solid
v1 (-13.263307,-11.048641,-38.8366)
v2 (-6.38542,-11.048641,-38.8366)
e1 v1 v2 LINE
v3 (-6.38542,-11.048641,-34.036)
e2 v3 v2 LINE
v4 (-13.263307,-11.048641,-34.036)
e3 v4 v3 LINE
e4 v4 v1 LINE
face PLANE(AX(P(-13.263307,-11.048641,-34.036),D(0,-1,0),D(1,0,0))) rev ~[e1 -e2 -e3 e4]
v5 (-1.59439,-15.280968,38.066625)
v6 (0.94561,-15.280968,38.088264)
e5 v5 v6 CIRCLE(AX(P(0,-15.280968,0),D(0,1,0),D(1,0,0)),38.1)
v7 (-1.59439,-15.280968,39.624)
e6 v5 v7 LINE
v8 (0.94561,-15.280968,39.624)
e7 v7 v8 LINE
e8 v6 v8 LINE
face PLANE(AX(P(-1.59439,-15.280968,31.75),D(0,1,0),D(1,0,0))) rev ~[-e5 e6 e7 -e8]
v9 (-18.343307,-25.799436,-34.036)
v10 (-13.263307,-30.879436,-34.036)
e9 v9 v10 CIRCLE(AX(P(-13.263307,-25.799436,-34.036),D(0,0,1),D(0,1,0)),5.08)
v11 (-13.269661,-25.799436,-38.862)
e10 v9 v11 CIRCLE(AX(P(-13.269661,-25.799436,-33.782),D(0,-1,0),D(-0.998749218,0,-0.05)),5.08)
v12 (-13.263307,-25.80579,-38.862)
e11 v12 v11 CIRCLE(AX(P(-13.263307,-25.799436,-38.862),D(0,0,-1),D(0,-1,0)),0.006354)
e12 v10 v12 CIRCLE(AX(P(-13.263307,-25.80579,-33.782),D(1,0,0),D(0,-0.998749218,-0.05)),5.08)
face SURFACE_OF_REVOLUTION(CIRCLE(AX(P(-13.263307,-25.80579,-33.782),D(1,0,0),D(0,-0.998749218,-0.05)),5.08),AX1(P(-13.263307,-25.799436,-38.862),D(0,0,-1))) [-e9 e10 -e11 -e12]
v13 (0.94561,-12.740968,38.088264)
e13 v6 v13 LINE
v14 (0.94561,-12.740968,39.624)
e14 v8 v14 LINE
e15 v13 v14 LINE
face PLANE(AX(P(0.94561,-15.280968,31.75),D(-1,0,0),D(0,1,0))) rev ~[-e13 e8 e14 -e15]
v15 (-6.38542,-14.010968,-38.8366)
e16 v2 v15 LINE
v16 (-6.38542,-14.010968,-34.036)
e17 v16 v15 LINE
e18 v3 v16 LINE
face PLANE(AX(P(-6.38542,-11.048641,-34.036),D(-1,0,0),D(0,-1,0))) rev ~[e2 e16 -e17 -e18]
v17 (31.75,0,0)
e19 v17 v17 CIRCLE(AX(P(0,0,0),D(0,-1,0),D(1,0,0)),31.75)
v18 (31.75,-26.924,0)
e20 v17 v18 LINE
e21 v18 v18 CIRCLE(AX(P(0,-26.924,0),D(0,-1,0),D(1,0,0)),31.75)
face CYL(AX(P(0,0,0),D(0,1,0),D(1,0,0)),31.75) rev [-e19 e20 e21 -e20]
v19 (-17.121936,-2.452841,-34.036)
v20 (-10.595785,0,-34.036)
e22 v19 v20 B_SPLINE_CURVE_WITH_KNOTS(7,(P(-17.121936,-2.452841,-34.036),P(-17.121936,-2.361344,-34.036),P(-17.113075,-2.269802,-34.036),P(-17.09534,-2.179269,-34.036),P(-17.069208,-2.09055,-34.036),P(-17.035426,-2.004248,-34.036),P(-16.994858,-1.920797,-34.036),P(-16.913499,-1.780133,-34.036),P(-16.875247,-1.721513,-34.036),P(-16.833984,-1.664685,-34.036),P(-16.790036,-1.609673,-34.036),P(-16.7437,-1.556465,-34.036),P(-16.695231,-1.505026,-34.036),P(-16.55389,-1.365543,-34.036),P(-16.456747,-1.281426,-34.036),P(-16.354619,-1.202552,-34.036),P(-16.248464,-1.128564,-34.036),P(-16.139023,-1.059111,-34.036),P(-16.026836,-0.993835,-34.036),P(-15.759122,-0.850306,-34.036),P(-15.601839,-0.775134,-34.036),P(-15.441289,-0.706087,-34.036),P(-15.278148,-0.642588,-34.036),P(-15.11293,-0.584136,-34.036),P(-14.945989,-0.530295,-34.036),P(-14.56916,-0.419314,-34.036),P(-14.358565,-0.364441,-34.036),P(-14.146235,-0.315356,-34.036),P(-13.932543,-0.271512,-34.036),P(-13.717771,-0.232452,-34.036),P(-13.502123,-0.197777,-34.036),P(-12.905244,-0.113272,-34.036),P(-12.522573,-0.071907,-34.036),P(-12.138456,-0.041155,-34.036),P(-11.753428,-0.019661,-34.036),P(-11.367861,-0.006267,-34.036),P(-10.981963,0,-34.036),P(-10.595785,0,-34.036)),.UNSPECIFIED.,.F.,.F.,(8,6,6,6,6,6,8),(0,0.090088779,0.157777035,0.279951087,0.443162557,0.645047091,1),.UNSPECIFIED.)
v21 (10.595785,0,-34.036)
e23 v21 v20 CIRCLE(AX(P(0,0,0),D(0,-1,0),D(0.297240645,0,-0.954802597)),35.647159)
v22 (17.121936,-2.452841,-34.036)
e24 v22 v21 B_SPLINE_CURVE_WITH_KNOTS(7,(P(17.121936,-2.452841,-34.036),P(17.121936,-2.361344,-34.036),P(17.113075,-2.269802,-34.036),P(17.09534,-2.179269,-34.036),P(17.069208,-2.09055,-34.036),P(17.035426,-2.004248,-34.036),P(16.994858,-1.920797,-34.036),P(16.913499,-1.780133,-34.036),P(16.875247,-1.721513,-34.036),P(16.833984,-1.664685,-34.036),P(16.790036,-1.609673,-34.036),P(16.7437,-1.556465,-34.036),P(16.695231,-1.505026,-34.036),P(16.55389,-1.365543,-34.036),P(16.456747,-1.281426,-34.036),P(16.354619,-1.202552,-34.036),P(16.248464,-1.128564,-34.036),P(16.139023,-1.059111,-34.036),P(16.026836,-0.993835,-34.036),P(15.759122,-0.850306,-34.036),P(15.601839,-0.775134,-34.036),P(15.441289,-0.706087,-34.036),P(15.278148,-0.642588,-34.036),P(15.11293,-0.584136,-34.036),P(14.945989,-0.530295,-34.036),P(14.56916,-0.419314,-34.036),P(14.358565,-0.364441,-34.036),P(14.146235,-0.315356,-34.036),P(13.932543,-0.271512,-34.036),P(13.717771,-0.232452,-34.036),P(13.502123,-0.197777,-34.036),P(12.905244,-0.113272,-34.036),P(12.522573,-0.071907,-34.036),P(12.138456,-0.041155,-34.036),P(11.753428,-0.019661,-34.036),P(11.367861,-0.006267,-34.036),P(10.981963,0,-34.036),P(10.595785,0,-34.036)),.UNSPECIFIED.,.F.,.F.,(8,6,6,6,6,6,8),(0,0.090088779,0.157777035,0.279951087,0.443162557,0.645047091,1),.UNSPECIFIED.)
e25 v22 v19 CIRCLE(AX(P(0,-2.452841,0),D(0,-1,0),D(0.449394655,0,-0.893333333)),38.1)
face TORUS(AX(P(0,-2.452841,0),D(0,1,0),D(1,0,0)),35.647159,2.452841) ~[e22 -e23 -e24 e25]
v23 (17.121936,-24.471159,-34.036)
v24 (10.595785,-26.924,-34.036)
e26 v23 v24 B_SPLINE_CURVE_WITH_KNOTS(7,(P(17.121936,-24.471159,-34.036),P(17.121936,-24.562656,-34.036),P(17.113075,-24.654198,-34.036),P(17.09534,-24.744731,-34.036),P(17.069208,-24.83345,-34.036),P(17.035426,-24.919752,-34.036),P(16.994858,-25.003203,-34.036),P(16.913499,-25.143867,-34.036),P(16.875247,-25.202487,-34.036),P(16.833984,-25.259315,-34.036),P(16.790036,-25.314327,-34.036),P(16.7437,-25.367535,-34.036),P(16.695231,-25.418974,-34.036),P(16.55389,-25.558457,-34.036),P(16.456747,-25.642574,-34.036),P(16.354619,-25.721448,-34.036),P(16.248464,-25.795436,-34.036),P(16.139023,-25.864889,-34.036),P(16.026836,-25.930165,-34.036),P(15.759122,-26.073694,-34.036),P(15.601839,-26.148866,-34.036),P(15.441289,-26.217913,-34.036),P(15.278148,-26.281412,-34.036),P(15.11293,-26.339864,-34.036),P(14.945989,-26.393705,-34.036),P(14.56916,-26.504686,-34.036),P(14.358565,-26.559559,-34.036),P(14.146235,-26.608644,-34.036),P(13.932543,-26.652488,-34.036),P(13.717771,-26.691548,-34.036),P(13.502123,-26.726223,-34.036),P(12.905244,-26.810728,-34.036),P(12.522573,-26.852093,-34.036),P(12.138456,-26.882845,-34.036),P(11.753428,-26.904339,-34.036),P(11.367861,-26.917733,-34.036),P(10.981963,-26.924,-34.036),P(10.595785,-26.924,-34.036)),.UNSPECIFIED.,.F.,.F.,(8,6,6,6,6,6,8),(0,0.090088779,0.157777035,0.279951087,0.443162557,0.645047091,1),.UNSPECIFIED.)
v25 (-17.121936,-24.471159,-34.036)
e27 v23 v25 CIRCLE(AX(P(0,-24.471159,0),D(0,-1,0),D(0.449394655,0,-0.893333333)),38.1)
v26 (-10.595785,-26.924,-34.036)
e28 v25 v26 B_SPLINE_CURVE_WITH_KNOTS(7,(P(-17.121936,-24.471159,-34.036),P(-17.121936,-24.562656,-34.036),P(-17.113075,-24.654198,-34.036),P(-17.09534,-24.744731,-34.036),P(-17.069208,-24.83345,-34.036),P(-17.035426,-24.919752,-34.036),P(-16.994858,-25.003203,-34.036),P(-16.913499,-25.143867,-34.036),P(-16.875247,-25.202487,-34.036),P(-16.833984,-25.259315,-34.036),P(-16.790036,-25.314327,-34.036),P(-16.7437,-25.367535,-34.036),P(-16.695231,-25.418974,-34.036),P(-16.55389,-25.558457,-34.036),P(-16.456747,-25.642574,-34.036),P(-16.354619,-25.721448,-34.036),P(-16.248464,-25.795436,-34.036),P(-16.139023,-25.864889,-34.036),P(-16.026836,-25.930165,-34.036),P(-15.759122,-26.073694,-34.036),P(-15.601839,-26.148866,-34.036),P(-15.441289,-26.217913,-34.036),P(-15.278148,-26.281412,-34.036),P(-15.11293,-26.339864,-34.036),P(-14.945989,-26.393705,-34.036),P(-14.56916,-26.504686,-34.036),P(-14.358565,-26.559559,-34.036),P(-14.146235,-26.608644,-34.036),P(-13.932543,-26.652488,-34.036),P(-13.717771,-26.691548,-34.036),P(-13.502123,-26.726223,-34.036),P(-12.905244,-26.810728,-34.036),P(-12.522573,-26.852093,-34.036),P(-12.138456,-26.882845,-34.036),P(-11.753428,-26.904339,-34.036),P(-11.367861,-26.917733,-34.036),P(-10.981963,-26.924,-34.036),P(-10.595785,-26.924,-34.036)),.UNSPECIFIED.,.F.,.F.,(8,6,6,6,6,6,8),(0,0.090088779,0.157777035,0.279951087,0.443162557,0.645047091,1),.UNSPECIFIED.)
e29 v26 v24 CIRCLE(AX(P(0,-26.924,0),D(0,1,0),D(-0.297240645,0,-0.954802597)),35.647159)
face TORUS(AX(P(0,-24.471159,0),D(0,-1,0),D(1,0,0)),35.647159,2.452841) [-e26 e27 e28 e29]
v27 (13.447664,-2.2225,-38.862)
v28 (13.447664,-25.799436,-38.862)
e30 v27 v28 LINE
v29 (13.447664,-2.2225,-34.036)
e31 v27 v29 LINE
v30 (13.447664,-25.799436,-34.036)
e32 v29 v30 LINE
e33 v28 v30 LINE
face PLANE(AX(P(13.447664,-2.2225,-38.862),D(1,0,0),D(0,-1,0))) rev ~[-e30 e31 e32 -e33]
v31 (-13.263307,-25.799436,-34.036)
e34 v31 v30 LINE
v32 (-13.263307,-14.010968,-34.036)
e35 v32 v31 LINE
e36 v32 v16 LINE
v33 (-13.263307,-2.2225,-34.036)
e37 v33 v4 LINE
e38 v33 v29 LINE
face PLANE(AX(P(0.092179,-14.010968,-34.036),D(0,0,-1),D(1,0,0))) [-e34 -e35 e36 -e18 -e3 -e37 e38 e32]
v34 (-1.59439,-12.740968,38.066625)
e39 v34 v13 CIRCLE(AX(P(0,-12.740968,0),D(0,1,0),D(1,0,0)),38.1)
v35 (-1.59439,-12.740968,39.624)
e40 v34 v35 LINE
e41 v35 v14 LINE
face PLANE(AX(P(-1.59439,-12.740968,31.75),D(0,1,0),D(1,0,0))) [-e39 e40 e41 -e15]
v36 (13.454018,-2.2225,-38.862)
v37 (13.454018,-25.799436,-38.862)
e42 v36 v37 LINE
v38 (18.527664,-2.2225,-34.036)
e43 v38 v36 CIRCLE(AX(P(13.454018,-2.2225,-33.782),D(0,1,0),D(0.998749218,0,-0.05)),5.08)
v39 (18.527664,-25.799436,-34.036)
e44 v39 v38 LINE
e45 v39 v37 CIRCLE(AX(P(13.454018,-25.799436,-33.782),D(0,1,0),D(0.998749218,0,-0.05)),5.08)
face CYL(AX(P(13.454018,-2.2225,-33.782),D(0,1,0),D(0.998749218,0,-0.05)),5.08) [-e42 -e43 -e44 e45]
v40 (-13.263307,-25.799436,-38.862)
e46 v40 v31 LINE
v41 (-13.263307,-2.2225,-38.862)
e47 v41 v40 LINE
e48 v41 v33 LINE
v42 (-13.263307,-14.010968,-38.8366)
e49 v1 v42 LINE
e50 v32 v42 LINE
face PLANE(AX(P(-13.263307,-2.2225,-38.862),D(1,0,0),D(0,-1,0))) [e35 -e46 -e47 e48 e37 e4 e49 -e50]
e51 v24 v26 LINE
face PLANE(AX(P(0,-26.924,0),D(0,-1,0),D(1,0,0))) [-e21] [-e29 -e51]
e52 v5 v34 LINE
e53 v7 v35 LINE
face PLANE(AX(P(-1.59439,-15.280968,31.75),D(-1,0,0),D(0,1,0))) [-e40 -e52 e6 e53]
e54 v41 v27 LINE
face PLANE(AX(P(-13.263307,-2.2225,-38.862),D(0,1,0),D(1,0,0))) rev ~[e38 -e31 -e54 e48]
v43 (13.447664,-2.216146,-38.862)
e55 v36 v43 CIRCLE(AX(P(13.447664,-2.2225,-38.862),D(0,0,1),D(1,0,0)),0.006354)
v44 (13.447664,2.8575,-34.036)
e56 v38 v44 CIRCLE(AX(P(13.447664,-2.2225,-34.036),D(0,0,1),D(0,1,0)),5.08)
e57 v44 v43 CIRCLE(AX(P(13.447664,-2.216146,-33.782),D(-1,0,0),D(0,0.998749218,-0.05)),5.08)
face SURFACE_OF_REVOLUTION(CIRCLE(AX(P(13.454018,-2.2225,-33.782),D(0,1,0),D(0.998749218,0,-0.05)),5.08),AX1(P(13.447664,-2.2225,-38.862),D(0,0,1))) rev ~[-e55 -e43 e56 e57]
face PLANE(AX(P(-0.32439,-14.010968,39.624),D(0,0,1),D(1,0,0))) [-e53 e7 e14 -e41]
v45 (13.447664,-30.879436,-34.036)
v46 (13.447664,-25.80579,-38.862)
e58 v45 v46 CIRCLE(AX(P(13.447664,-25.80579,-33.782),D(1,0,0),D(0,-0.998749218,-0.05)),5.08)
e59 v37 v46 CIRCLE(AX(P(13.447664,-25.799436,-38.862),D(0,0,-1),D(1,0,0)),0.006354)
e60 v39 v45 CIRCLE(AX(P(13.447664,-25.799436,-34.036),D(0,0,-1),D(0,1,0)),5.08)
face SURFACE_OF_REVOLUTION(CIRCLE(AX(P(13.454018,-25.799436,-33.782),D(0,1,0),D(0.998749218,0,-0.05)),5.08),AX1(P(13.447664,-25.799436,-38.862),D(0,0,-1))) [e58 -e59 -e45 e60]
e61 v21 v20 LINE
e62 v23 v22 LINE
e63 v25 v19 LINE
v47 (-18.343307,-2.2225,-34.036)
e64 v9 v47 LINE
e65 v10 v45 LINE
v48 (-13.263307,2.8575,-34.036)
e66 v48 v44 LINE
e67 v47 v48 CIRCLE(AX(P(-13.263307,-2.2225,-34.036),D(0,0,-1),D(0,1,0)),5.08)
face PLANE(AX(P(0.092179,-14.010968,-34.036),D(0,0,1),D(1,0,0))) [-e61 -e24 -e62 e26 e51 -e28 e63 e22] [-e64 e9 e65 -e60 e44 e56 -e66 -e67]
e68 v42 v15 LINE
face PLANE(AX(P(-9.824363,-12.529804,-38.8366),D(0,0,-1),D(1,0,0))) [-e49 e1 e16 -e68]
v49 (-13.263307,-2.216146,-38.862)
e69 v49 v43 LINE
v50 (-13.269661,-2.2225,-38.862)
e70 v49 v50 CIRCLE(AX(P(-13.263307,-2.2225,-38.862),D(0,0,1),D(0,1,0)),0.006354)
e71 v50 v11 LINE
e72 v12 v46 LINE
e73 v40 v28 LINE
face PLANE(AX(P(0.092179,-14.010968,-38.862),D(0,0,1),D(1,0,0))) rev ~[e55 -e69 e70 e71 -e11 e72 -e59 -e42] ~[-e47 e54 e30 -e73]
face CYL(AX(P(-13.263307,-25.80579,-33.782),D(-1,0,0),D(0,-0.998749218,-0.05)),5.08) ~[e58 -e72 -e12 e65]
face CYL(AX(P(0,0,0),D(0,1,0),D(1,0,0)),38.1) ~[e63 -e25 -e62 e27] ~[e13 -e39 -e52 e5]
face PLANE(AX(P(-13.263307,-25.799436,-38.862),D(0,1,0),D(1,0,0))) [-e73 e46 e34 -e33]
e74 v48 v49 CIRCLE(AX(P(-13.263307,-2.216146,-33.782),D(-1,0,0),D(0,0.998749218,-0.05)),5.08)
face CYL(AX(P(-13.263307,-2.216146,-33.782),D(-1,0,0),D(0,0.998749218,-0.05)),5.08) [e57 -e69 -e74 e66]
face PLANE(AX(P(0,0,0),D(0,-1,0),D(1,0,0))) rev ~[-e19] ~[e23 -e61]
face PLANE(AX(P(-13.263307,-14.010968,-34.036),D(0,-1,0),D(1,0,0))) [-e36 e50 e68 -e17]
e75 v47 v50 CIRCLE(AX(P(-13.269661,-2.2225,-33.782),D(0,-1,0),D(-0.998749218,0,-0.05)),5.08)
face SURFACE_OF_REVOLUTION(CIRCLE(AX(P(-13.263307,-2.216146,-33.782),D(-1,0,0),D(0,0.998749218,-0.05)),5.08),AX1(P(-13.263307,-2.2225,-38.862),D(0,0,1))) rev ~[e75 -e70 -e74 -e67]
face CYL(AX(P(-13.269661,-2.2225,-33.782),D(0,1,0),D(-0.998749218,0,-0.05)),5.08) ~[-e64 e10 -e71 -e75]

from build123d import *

# Parameters (mm, degrees)
F0_R         = 38.1
F0_R_2       = 31.75
F1_DEPTH     = 26.924
F2_R         = 2.4528409794
F4_START     = -34.036
F3_W         = 36.8709713221
F3_H         = 33.7369362824
F4_DEPTH     = 4.826
F5_R         = 5.08
F6_W         = 26.7109713221
F6_H         = 23.5769362824
F7_DEPTH     = 4.826
F8_T1_DEPTH  = 26.7109713221
F8_T3_DEPTH  = 23.5769362824
F8_T6_ANGLE  = 90
F8_T8_ANGLE  = 90
F8_T10_ANGLE = 90
F8_T12_ANGLE = 90
F9_W         = 6.8778875601
F9_H         = 2.9623268638
F10_DEPTH    = 4.8006
F12_START    = 31.75
F11_W        = 2.54
F11_H        = 2.54
F12_DEPTH    = 7.874


# Not quite as in the source:
# - a fillet or chamfer that OpenCascade refuses, or shapes differently, is made with other operations: its cross-section is extruded or revolved along the edge and cut away or added


with BuildPart() as f1:
    # F0 (on Front) → F1 (new body)
    with BuildSketch(Plane.XZ):
        Circle(F0_R)
        Circle(F0_R_2, mode=Mode.SUBTRACT)
    extrude(amount=F1_DEPTH)

    # F2
    f2_edges = [f1.edges().sort_by_distance(p)[0] for p in [
        (-38.1, -26.924, 0),
        (-38.1, 0, 0),
    ]]
    fillet(f2_edges, radius=F2_R)

    # F3 (on Top) → F4 (join)
    with BuildSketch(Plane.XY.offset(F4_START)):
        with Locations((0.0921785831, -14.0109679196)):
            Rectangle(F3_W, F3_H)
    extrude(amount=-F4_DEPTH)

    # F5
    f5_edges = [f1.edges().sort_by_distance(p)[0] for p in [
        (-18.343307, 2.8575, -36.449),
        (18.527664, 2.8575, -36.449),
        (18.527664, -30.879436, -36.449),
        (-18.343307, -30.879436, -36.449),
    ]]
    fillet(f5_edges, radius=F5_R)

    # F6 (on face) → F7 (cut)
    with BuildSketch(Plane(origin=(0, 0, -38.862), x_dir=(1, 0, 0), z_dir=(0, 0, -1))):
        with Locations((0.0921785831, 14.0109679196)):
            Rectangle(F6_W, F6_H)
    extrude(amount=-F7_DEPTH, mode=Mode.SUBTRACT)

    # F8: fillet of radius 5.08 on 1 edges, made by hand

    # F8_s2 → F8_t1 (cut)
    with BuildSketch(Plane.YZ.offset(-13.2633070779)):
        with BuildLine():
            ThreePointArc((-30.8794360608, -34.036), (-29.3069384175, -37.4628096935), (-25.8057900345, -38.862))
            Line((-25.8057900345, -38.862), (-30.8794360608, -38.862))
            Line((-30.8794360608, -38.862), (-30.8794360608, -34.036))
        make_face()
        with BuildLine():
            ThreePointArc((2.8575002216, -34.036), (1.2850025783, -37.4628096935), (-2.2161458047, -38.862))
            Line((-2.2161458047, -38.862), (2.8575002216, -38.862))
            Line((2.8575002216, -38.862), (2.8575002216, -34.036))
        make_face()
    extrude(amount=F8_T1_DEPTH, mode=Mode.SUBTRACT)

    # F8_s4 → F8_t3 (cut)
    with BuildSketch(Plane.XZ.offset(2.2224997784)):
        with BuildLine():
            ThreePointArc((18.5276642442, -34.036), (16.9551666009, -37.4628096935), (13.4540182179, -38.862))
            Line((13.4540182179, -38.862), (18.5276642442, -38.862))
            Line((18.5276642442, -38.862), (18.5276642442, -34.036))
        make_face()
        with BuildLine():
            ThreePointArc((-18.3433070779, -34.036), (-16.7708094346, -37.4628096935), (-13.2696610516, -38.862))
            Line((-13.2696610516, -38.862), (-18.3433070779, -38.862))
            Line((-18.3433070779, -38.862), (-18.3433070779, -34.036))
        make_face()
    extrude(amount=F8_T3_DEPTH, mode=Mode.SUBTRACT)

    # F8_s5 → F8_t6 (revolve, cut)
    with BuildSketch(Plane.YZ.offset(-13.2633070779)):
        with BuildLine():
            ThreePointArc((-30.8794360608, -34.036), (-29.3069384175, -37.4628096935), (-25.8057900345, -38.862))
            Line((-25.8057900345, -38.862), (-30.8794360608, -38.862))
            Line((-30.8794360608, -38.862), (-30.8794360608, -34.036))
        make_face()
    revolve(axis=Axis((-13.2633070779, -25.7994360608, -38.862), (0, 0, -1)), revolution_arc=F8_T6_ANGLE, mode=Mode.SUBTRACT)

    # F8_s7 → F8_t8 (revolve, cut)
    with BuildSketch(Plane.XZ.offset(25.7994360608)):
        with BuildLine():
            ThreePointArc((18.5276642442, -34.036), (16.9551666009, -37.4628096935), (13.4540182179, -38.862))
            Line((13.4540182179, -38.862), (18.5276642442, -38.862))
            Line((18.5276642442, -38.862), (18.5276642442, -34.036))
        make_face()
    revolve(axis=Axis((13.4476642442, -25.7994360608, -38.862), (0, 0, -1)), revolution_arc=F8_T8_ANGLE, mode=Mode.SUBTRACT)

    # F8_s9 → F8_t10 (revolve, cut)
    with BuildSketch(Plane.XZ.offset(2.2224997784)):
        with BuildLine():
            ThreePointArc((18.5276642442, -34.036), (16.9551666009, -37.4628096935), (13.4540182179, -38.862))
            Line((13.4540182179, -38.862), (18.5276642442, -38.862))
            Line((18.5276642442, -38.862), (18.5276642442, -34.036))
        make_face()
    revolve(axis=Axis((13.4476642442, -2.2224997784, -38.862), (0, 0, 1)), revolution_arc=F8_T10_ANGLE, mode=Mode.SUBTRACT)

    # F8_s11 → F8_t12 (revolve, cut)
    with BuildSketch(Plane.YZ.offset(-13.2633070779)):
        with BuildLine():
            ThreePointArc((2.8575002216, -34.036), (1.2850025783, -37.4628096935), (-2.2161458047, -38.862))
            Line((-2.2161458047, -38.862), (2.8575002216, -38.862))
            Line((2.8575002216, -38.862), (2.8575002216, -34.036))
        make_face()
    revolve(axis=Axis((-13.2633070779, -2.2224997784, -38.862), (0, 0, 1)), revolution_arc=F8_T12_ANGLE, mode=Mode.SUBTRACT)

    # F9 (on face) → F10 (join)
    with BuildSketch(Plane(origin=(0, 0, -34.036), x_dir=(1, 0, 0), z_dir=(0, 0, -1))):
        with Locations((-9.8243632978, 12.5298044877)):
            Rectangle(F9_W, F9_H)
    extrude(amount=F10_DEPTH)

    # F11 (on Top) → F12 (join)
    with BuildSketch(Plane.XY.offset(F12_START)):
        with Locations((-0.3243902236, -14.0109681524)):
            Rectangle(F11_W, F11_H)
    extrude(amount=F12_DEPTH)


solid = f1.part
